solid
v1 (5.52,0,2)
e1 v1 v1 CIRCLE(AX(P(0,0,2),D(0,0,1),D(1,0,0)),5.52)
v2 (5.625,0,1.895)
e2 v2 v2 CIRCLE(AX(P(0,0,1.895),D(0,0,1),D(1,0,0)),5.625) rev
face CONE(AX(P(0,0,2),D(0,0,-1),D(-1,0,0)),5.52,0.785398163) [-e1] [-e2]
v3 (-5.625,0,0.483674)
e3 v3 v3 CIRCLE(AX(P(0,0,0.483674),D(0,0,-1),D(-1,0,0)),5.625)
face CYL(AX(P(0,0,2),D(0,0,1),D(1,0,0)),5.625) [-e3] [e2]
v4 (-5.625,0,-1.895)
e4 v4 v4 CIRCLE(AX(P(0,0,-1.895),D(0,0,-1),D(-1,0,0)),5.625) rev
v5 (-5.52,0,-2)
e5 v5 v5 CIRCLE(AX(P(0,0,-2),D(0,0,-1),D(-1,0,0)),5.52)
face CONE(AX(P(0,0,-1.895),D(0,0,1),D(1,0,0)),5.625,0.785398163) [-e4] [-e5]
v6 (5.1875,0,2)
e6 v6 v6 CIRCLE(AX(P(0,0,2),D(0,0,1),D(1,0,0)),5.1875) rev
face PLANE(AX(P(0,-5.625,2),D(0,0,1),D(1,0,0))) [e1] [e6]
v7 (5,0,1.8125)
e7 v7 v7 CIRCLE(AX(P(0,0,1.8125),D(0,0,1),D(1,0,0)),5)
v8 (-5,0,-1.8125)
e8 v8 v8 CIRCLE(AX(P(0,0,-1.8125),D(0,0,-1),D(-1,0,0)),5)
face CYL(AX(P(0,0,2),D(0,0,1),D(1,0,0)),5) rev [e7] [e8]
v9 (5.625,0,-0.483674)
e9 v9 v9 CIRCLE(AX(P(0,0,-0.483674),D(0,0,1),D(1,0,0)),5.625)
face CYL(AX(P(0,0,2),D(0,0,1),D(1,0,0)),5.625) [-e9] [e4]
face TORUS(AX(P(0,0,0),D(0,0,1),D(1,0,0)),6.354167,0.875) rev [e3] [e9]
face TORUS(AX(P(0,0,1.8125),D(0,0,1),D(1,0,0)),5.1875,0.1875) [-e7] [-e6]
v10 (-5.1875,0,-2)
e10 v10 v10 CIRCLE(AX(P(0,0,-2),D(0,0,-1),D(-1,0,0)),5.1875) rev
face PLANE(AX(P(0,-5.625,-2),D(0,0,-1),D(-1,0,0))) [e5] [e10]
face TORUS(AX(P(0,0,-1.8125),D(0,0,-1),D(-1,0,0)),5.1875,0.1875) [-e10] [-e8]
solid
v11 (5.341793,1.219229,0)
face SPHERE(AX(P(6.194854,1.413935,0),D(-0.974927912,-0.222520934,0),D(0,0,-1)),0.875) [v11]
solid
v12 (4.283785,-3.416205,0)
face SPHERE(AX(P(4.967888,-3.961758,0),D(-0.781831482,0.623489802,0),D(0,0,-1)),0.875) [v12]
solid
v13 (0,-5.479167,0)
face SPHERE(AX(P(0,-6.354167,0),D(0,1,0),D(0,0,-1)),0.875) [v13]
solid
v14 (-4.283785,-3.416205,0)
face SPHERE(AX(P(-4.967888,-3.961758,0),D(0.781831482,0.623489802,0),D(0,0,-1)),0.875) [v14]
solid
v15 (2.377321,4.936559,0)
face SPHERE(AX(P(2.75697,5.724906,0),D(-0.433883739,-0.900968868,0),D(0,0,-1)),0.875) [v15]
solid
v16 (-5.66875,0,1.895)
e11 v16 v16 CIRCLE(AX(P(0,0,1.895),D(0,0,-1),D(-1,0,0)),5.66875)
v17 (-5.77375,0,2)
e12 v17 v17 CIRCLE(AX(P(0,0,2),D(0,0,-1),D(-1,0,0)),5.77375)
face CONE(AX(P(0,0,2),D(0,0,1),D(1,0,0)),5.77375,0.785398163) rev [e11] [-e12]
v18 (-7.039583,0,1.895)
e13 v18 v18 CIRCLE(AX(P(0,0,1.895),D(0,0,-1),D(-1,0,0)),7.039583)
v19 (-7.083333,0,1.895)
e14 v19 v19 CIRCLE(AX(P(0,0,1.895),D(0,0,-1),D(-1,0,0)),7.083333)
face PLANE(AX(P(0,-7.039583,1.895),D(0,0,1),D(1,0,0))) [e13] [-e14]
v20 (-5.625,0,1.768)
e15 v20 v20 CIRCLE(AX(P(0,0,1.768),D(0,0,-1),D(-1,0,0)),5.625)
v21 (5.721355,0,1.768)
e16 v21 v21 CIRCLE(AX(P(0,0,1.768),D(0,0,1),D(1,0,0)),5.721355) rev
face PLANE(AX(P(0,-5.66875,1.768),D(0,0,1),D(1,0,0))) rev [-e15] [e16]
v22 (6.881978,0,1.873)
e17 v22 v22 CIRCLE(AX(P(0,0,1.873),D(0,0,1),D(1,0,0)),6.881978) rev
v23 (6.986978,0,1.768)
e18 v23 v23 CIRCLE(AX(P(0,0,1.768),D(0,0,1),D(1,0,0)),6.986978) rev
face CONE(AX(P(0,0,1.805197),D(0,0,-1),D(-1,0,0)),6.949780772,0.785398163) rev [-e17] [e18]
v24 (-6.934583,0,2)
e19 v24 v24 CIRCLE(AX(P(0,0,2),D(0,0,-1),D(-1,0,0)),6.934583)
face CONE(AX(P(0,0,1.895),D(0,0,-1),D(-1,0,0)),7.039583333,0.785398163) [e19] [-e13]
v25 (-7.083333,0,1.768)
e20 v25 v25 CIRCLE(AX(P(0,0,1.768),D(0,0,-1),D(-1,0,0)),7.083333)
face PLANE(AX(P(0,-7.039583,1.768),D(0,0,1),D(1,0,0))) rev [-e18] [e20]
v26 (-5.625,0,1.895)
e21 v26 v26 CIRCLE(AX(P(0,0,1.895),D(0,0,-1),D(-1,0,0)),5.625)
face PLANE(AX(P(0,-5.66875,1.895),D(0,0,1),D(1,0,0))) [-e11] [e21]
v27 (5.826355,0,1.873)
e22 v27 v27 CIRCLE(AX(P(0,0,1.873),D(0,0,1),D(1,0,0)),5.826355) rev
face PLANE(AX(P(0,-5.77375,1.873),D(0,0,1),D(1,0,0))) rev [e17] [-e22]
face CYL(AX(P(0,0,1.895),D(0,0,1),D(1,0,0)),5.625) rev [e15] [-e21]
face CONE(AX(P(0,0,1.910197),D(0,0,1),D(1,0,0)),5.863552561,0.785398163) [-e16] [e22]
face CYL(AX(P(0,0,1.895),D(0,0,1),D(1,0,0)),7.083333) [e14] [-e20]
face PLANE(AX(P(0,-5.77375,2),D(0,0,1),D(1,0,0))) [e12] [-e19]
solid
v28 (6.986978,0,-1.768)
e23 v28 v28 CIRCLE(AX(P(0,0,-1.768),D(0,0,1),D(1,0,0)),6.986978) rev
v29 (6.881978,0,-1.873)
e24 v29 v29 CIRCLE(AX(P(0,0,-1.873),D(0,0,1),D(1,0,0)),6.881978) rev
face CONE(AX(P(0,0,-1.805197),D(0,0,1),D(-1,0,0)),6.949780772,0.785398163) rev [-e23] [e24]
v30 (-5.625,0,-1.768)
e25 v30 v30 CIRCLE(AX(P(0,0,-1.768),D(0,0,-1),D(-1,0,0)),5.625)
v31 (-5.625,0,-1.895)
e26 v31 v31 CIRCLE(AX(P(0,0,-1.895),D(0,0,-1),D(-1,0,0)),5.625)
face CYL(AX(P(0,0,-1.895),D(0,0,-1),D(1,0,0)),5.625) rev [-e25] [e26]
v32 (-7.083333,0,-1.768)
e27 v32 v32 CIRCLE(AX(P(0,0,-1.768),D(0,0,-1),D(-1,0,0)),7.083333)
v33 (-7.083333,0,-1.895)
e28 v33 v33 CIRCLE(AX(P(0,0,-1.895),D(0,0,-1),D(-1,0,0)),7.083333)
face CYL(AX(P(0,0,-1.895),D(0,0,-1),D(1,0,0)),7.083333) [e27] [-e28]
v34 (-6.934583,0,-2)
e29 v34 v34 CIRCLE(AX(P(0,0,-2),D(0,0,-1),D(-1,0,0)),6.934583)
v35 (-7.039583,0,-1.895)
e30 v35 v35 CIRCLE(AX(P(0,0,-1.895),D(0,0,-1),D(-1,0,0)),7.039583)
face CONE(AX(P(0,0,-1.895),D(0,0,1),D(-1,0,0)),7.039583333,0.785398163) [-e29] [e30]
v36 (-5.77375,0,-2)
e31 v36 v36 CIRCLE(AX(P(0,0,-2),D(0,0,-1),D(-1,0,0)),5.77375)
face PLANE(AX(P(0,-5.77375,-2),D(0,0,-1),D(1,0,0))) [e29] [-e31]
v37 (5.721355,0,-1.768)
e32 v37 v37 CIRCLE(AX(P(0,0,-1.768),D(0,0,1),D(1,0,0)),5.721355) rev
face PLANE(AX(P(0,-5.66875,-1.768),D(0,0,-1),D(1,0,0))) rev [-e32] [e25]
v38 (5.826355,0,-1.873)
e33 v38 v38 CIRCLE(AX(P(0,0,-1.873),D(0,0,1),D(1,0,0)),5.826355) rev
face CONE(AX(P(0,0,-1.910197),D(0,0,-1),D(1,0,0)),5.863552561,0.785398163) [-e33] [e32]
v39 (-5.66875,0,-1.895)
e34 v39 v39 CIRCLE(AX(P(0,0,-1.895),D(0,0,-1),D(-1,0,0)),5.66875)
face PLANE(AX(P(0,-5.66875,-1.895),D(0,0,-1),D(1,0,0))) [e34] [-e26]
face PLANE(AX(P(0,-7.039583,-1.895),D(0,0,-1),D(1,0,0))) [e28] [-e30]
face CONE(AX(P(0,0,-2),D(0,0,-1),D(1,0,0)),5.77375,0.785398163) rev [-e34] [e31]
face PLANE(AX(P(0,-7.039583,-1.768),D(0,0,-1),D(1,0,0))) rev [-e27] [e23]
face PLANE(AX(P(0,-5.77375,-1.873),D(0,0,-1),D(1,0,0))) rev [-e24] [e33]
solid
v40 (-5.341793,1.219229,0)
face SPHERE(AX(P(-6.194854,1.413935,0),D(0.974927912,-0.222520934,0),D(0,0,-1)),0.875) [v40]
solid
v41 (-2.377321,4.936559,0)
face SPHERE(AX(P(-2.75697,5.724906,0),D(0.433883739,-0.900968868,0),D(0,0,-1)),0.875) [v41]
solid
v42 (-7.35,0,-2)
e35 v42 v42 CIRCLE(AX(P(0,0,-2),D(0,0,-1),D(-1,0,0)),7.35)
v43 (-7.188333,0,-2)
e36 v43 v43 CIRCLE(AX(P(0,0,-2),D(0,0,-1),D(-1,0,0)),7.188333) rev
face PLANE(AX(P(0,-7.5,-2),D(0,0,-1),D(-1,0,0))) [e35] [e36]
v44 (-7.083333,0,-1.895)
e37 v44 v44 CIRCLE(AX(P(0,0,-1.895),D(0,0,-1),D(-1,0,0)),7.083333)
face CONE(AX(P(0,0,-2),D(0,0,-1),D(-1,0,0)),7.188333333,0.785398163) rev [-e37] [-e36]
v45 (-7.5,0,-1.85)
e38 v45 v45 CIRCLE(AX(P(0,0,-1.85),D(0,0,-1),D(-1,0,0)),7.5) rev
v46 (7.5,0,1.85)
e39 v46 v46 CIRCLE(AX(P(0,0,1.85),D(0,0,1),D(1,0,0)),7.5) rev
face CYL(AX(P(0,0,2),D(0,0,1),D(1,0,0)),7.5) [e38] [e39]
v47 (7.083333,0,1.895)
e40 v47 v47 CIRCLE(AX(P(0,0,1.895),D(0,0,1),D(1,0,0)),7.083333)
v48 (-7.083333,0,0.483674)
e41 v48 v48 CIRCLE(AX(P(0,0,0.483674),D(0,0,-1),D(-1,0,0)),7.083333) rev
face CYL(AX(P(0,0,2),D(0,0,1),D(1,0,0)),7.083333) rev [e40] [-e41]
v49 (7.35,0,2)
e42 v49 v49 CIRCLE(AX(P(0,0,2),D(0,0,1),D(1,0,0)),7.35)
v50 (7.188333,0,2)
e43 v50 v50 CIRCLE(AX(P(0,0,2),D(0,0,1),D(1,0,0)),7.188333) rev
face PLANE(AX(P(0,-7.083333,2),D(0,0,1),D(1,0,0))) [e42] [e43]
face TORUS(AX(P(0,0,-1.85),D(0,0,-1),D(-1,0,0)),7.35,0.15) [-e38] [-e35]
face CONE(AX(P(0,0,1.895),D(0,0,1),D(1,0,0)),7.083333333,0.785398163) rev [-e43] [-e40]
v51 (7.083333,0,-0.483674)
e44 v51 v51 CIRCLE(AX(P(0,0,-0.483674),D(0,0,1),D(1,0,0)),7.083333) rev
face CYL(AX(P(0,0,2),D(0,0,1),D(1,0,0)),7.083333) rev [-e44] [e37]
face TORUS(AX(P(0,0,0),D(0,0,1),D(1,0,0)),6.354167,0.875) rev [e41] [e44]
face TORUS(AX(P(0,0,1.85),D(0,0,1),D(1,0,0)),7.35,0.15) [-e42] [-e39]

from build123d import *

# Parameters (mm, degrees)
SKETCH3_W         = 4
SKETCH3_H         = 0.416666667
SKETCH3_H_2       = 0.625
SKETCH4_R         = 0.875
CIRPATTERN1_COUNT = 7
FILLET1_R         = 0.15
FILLET2_R         = 0.1875
CHAMFER1_SIZE     = 0.105
CHAMFER2_SIZE     = 0.105


# Read off the part's stored shape, not the designer's step: Thicken1
with BuildPart() as part:
    # Sketch3 → Revolve1 (revolve)
    with BuildSketch(Plane(origin=(0, 0, 0), x_dir=(0, 0, -1), z_dir=(1, 0, 0)), mode=Mode.PRIVATE) as revolve1_sk:
        with Locations((0, -7.291666667)):
            Rectangle(SKETCH3_W, SKETCH3_H)
        with Locations((0, -5.3125)):
            Rectangle(SKETCH3_W, SKETCH3_H_2)
    revolve(revolve1_sk.sketch.rotate(Axis((0, 0, 2), (0, 0, -1)), 270), axis=Axis((0, 0, 2), (0, 0, -1)))

    # Sketch4 → Cut-Revolve1 (revolve, cut)
    with BuildSketch(Plane(origin=(0, 0, 0), x_dir=(0, 0, -1), z_dir=(1, 0, 0)), mode=Mode.PRIVATE) as cut_revolve1_sk:
        with Locations((0, -6.354166667)):
            Circle(SKETCH4_R)
    revolve(cut_revolve1_sk.sketch.rotate(Axis((0, 0, 2), (0, 0, -1)), 270), axis=Axis((0, 0, 2), (0, 0, -1)), mode=Mode.SUBTRACT)

    # Fillet1
    fillet1_edges = [part.edges().sort_by_distance(p)[0] for p in [
        (-7.5, 0, -2),
        (-7.5, 0, 2),
    ]]
    fillet(fillet1_edges, radius=FILLET1_R)

    # Fillet2
    fillet2_edges = [part.edges().sort_by_distance(p)[0] for p in [
        (-5, 0, -2),
        (-5, 0, 2),
    ]]
    fillet(fillet2_edges, radius=FILLET2_R)

    # Chamfer1
    chamfer1_edges = [part.edges().sort_by_distance(p)[0] for p in [
        (-7.083333333, 0, 2),
        (-7.083333333, 0, -2),
    ]]
    chamfer(chamfer1_edges, length=CHAMFER1_SIZE)

    # Chamfer2
    chamfer2_edges = [part.edges().sort_by_distance(p)[0] for p in [
        (-5.625, 0, 2),
        (-5.625, 0, -2),
    ]]
    chamfer(chamfer2_edges, length=CHAMFER2_SIZE)


with BuildPart() as body_2:
    # Sketch5 → Revolve2 (revolve)
    with BuildSketch(Plane(origin=(0, 0, 0), x_dir=(0, 0, -1), z_dir=(1, 0, 0))):
        with BuildLine():
            Line((0, -5.479166667), (0, -7.229166667))
            ThreePointArc((0, -7.229166667), (0.875, -6.354166667), (0, -5.479166667))
        make_face()
    revolve(axis=Axis((0, -5.479166667, 0), (0, -1, 0)))


with BuildPart() as cirpattern1_1:
    # CirPattern1: pattern copy
    add(body_2.part.rotate(Axis((0, 0, 0), (0, 0, 1)), 1 * 360 / CIRPATTERN1_COUNT))


with BuildPart() as cirpattern1_2:
    # CirPattern1: pattern copy
    add(body_2.part.rotate(Axis((0, 0, 0), (0, 0, 1)), 2 * 360 / CIRPATTERN1_COUNT))


with BuildPart() as cirpattern1_3:
    # CirPattern1: pattern copy
    add(body_2.part.rotate(Axis((0, 0, 0), (0, 0, 1)), 3 * 360 / CIRPATTERN1_COUNT))


with BuildPart() as cirpattern1_4:
    # CirPattern1: pattern copy
    add(body_2.part.rotate(Axis((0, 0, 0), (0, 0, 1)), 4 * 360 / CIRPATTERN1_COUNT))


with BuildPart() as cirpattern1_5:
    # CirPattern1: pattern copy
    add(body_2.part.rotate(Axis((0, 0, 0), (0, 0, 1)), 5 * 360 / CIRPATTERN1_COUNT))


with BuildPart() as cirpattern1_6:
    # CirPattern1: pattern copy
    add(body_2.part.rotate(Axis((0, 0, 0), (0, 0, 1)), 6 * 360 / CIRPATTERN1_COUNT))


with BuildPart() as body_9:
    # Thicken1 outline → Thicken1 (revolve)
    with BuildSketch(Plane.XZ):
        Polygon((5.625, 1.895), (5.625, 1.768), (5.721355122, 1.768), (5.826355122, 1.873), (6.881978211, 1.873), (6.986978211, 1.768), (7.083333333, 1.768), (7.083333333, 1.895), (7.039583333, 1.895), (6.934583333, 2), (5.77375, 2), (5.66875, 1.895), align=None)
    revolve(axis=Axis((0, 0, 0), (0, 0, 1)))


with BuildPart() as body_10:
    # Mirror1: mirrored copy
    add(body_9.part.mirror(Plane.XY))


solid = Compound([part.part, body_2.part, cirpattern1_1.part, cirpattern1_2.part, cirpattern1_3.part, cirpattern1_4.part, cirpattern1_5.part, cirpattern1_6.part, body_9.part, body_10.part])
